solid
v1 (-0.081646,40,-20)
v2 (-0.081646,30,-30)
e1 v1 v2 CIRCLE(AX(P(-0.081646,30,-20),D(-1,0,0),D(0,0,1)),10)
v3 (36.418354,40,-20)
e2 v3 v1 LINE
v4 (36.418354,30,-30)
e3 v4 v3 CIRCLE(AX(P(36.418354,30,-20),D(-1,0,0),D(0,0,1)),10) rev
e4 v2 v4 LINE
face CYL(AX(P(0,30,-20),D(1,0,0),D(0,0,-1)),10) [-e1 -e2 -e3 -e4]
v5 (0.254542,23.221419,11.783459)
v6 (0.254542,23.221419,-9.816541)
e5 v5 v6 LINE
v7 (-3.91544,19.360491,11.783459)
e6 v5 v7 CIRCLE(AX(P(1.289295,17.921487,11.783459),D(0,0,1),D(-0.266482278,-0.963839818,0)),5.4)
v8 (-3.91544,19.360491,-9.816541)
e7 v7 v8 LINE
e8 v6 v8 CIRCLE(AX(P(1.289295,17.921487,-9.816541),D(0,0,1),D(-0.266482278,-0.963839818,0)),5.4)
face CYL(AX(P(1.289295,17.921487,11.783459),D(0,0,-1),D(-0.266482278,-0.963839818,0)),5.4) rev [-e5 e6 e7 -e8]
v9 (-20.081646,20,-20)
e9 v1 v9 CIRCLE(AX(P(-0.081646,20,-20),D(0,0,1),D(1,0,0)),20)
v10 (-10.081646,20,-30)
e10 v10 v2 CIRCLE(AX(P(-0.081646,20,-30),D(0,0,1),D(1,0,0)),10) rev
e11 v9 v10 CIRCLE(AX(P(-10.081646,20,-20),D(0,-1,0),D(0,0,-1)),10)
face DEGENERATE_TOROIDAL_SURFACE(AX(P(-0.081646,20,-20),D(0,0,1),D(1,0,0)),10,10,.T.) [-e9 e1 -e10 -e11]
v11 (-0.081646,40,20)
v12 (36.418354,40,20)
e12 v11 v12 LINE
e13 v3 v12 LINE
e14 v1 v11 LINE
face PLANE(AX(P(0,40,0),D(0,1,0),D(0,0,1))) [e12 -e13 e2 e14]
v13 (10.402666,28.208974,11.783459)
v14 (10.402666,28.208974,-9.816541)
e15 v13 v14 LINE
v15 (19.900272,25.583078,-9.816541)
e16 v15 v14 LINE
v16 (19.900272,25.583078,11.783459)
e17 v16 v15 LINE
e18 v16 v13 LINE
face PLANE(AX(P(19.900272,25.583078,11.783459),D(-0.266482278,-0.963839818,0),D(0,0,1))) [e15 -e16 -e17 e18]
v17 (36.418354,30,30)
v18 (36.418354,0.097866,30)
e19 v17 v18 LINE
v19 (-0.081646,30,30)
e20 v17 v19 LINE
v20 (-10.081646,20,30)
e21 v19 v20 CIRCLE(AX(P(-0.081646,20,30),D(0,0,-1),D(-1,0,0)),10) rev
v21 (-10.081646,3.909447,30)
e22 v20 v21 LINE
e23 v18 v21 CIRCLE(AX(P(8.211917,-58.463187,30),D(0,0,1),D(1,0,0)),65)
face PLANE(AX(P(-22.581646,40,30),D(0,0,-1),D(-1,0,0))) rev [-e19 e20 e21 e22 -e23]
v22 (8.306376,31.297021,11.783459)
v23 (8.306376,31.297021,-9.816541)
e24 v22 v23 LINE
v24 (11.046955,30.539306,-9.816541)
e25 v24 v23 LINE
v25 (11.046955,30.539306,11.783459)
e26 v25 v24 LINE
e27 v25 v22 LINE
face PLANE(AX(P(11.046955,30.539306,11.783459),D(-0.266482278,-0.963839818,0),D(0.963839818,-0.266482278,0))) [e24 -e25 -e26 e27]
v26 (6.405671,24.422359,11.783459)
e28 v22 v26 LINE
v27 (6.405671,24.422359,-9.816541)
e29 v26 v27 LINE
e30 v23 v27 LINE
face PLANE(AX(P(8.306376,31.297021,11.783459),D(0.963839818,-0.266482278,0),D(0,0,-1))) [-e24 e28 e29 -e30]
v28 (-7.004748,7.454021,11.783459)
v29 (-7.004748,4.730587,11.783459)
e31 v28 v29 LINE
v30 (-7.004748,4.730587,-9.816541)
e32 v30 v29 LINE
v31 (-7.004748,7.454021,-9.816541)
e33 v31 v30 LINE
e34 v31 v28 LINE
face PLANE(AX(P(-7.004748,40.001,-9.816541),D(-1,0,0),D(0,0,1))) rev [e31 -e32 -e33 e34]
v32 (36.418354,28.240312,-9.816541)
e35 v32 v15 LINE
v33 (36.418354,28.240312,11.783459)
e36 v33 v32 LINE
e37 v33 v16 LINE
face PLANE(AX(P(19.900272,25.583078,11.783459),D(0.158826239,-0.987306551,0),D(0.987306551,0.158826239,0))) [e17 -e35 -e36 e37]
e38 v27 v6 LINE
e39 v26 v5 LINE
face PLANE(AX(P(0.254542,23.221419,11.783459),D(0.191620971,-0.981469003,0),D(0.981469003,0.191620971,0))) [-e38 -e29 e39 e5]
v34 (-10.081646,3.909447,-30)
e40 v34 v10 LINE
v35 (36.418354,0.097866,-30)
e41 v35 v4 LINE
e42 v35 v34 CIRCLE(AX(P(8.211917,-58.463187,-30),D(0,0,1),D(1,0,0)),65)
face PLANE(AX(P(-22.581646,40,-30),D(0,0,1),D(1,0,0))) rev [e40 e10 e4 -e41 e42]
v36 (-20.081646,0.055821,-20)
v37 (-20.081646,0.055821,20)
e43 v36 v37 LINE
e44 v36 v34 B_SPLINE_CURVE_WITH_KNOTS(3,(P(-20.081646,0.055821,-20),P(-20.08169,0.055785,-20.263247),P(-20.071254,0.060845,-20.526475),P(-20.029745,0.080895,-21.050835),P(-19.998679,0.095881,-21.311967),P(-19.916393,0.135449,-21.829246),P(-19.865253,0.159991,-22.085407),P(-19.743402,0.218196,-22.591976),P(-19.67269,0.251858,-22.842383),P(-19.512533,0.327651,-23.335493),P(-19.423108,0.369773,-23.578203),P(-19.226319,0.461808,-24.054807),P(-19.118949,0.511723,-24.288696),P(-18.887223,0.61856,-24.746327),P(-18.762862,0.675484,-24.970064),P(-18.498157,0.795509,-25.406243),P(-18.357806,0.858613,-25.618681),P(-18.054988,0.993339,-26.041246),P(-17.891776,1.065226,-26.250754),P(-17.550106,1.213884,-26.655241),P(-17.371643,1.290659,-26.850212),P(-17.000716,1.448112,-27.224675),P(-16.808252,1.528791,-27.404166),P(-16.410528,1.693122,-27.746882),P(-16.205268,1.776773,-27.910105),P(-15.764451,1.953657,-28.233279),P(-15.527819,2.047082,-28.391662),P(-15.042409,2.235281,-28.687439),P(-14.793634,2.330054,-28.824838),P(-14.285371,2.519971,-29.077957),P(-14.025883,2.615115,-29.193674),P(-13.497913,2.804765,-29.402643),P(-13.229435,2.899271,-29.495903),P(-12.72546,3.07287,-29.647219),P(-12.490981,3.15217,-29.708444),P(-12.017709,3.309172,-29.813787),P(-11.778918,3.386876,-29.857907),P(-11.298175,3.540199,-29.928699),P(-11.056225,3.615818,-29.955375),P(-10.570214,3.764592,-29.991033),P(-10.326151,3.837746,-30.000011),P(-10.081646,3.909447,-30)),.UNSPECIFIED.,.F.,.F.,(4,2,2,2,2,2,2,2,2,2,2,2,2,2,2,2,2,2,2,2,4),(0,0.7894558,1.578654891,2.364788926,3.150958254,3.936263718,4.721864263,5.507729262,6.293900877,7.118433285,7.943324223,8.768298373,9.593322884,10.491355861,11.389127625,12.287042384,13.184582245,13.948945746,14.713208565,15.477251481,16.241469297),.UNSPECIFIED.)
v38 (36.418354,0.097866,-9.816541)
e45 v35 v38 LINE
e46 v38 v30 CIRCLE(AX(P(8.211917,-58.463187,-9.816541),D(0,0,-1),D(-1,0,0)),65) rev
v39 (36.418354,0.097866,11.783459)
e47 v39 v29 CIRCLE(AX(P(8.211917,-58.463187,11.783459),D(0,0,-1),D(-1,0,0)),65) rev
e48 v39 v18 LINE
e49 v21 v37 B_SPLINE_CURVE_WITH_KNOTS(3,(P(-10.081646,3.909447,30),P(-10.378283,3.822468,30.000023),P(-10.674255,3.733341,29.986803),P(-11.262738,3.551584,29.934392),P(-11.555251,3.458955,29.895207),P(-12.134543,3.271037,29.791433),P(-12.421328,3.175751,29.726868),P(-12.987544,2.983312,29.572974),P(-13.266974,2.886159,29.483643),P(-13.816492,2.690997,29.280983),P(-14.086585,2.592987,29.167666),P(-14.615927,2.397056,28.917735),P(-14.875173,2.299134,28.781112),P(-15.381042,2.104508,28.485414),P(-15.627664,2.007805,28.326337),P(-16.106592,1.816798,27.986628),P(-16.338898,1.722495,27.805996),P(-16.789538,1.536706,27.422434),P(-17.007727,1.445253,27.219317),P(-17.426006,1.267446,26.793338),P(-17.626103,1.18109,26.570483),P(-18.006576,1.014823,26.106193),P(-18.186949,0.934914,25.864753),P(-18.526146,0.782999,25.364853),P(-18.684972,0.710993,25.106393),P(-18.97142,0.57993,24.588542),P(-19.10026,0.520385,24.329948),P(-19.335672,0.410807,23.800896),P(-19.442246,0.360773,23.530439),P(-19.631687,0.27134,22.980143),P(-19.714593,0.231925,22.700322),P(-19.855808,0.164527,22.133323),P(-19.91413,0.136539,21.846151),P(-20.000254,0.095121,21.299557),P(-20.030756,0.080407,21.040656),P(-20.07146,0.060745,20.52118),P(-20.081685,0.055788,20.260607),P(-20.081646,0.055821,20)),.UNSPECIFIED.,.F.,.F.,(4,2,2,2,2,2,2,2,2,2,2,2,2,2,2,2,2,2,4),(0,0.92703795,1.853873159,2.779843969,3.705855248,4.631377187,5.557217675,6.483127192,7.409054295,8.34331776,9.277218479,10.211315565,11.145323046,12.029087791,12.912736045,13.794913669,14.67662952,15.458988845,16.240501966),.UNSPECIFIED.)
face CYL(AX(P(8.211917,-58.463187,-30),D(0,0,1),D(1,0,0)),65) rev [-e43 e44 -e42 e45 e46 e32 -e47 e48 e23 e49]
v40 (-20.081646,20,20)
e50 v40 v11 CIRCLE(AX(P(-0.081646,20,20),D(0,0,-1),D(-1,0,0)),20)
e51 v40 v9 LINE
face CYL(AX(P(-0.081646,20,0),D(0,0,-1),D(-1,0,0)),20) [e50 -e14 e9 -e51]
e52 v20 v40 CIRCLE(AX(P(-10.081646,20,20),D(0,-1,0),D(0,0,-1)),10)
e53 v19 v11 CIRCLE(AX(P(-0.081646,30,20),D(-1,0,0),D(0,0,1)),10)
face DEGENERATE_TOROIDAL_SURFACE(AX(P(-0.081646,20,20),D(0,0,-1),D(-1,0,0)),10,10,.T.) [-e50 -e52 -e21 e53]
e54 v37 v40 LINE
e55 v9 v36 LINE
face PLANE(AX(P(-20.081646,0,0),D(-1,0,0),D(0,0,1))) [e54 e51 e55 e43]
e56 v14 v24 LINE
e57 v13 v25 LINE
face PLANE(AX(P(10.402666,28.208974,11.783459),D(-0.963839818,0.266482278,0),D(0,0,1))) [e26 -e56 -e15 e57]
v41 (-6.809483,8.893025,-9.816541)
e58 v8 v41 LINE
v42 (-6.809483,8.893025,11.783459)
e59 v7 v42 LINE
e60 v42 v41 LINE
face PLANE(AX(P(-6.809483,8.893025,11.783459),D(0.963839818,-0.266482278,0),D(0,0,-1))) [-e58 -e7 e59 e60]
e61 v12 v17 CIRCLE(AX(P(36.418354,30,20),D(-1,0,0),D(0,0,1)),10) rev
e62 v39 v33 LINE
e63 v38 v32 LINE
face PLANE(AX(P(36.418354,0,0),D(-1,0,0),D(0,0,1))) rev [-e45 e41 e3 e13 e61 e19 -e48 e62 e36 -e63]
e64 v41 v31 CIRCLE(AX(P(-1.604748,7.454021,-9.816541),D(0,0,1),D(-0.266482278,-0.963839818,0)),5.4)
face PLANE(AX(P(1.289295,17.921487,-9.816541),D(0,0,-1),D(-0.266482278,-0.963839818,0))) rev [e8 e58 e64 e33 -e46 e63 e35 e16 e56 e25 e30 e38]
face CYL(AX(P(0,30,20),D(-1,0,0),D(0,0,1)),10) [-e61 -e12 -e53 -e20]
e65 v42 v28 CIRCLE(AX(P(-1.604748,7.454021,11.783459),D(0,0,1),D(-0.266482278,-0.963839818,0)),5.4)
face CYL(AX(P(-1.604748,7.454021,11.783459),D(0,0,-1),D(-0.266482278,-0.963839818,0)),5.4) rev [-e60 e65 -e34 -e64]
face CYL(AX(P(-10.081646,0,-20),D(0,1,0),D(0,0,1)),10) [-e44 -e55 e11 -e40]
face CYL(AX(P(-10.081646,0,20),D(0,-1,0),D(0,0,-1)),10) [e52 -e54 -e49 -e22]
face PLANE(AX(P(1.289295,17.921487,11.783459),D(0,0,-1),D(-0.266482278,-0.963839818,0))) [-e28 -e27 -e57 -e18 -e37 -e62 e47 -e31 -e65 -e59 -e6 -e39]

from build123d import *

# Parameters (mm, degrees)
SKETCH1_W                      = 60
SKETCH1_H                      = 60
BOSS_EXTRUDE1_DEPTH            = 40
SKETCH2_R                      = 65
CUT_EXTRUDE1_DEPTH             = 82.241203775
CAVITY1_START                  = -9.816541319
CAVITY1_DEPTH                  = 21.6
SKETCH3_W                      = 21.6
SKETCH3_H                      = 10.847854466
CUT_EXTRUDE2_DEPTH             = 10
SKETCH4_W                      = 60
SKETCH4_H                      = 40
CUT_EXTRUDE3_DEPTH             = 2.5
SKETCH5_W                      = 60
SKETCH5_H                      = 40
CUT_EXTRUDE4_DEPTH             = 1
FILLET1_R                      = 20
FILLET2_R                      = 10
SKETCH6_W                      = 16.032155739
SKETCH6_H                      = 21.6
CUT_EXTRUDE5_DEPTH             = 58.845323025
CUT_EXTRUDE5_DIRECTION_2_REACH = 59.845


# Read off the part's stored shape, not the designer's step: Cavity1
with BuildPart() as part:
    # Sketch1 → Boss-Extrude1 (new body)
    with BuildSketch(Plane(origin=(0, 0, 0), x_dir=(1, 0, 0), z_dir=(0, 1, 0))):
        with Locations((7.418353663, 0)):
            Rectangle(SKETCH1_W, SKETCH1_H)
    extrude(amount=BOSS_EXTRUDE1_DEPTH)

    # Sketch2 → Cut-Extrude1 (cut, through all)
    with BuildSketch(Plane.XY.offset(30)):
        with Locations((8.211917099, -58.463187122)):
            Circle(SKETCH2_R)
    extrude(amount=-CUT_EXTRUDE1_DEPTH, mode=Mode.SUBTRACT)

    # Cavity1 outline → Cavity1 (cut)
    with BuildSketch(Plane.XY.offset(CAVITY1_START)):
        with BuildLine():
            Line((37.418353663, 28.401179965), (19.900272044, 25.583077508))
            Line((19.900272044, 25.583077508), (10.402665556, 28.20897422))
            Line((10.402665556, 28.20897422), (11.046955399, 30.539306317))
            Line((11.046955399, 30.539306317), (8.306376045, 31.297021255))
            Line((8.306376045, 31.297021255), (6.40567059, 24.42235921))
            Line((6.40567059, 24.42235921), (0.254542205, 23.221419402))
            ThreePointArc((0.254542205, 23.221419402), (-2.379423034, 21.883873023), (-3.91543957, 19.360491087))
            Line((-3.91543957, 19.360491087), (-6.809482783, 8.89302545))
            ThreePointArc((-6.809482783, 8.89302545), (-6.970209101, 6.844246899), (-6.353840253, 4.883783703))
            ThreePointArc((-6.353840253, 4.883783703), (14.742582186, 6.207906989), (35.148358053, 0.692777486))
            Line((35.148358053, 0.692777486), (37.418353663, 2.423285883))
            Line((37.418353663, 2.423285883), (37.418353663, 28.401179965))
        make_face()
    extrude(amount=CAVITY1_DEPTH, mode=Mode.SUBTRACT)

    # Sketch3 → Cut-Extrude2 (cut)
    with BuildSketch(Plane(origin=(37.418353663, 0, 0), x_dir=(0, 0, -1), z_dir=(1, 0, 0))):
        with Locations((-0.983458681, 5.423927233)):
            Rectangle(SKETCH3_W, SKETCH3_H)
    extrude(amount=-CUT_EXTRUDE2_DEPTH, mode=Mode.SUBTRACT)

    # Sketch4 → Cut-Extrude3 (cut)
    with BuildSketch(Plane.ZY.offset(22.581646337)):
        with Locations((0, 20)):
            Rectangle(SKETCH4_W, SKETCH4_H)
    extrude(amount=-CUT_EXTRUDE3_DEPTH, mode=Mode.SUBTRACT)

    # Sketch5 → Cut-Extrude4 (cut)
    with BuildSketch(Plane(origin=(37.418353663, 0, 0), x_dir=(0, 0, -1), z_dir=(1, 0, 0))):
        with Locations((0, 20)):
            Rectangle(SKETCH5_W, SKETCH5_H)
    extrude(amount=-CUT_EXTRUDE4_DEPTH, mode=Mode.SUBTRACT)

    # Fillet1
    fillet1_edges = [part.edges().sort_by_distance(p)[0] for p in [
        (-20.081646337, 40, 0),
    ]]
    fillet(fillet1_edges, radius=FILLET1_R)

    # Fillet2
    fillet2_edges = [part.edges().sort_by_distance(p)[0] for p in [
        (-20.081646337, 10.027910314, 30),
        (18.168353663, 40, -30),
        (-20.081646337, 10.027910314, -30),
        (-14.22378196, 34.142135624, -30),
        (18.168353663, 40, 30),
        (-14.22378196, 34.142135624, 30),
    ]]
    fillet(fillet2_edges, radius=FILLET2_R)

    # Sketch6 → Cut-Extrude5 (cut)
    with BuildSketch(Plane(origin=(0, 6.536812878, 0), x_dir=(-1, 0, 0), z_dir=(0, -1, 0))):
        with Locations((-1.011330106, -0.983458681)):
            Rectangle(SKETCH6_W, SKETCH6_H)
    extrude(amount=CUT_EXTRUDE5_DEPTH, mode=Mode.SUBTRACT)

    # Sketch6 → Cut-Extrude5 direction 2 (cut, up to next)
    with BuildSketch(Plane(origin=(0, 6.536812878, 0), x_dir=(-1, 0, 0), z_dir=(0, -1, 0)), mode=Mode.PRIVATE) as cut_extrude5_direction_2_sk1:
        with Locations((-1.011330106, -0.983458681)):
            Rectangle(SKETCH6_W, SKETCH6_H)
    cut_extrude5_direction_2_tool1 = extrude(cut_extrude5_direction_2_sk1.sketch, amount=-CUT_EXTRUDE5_DIRECTION_2_REACH, mode=Mode.PRIVATE) & part.part
    add(cut_extrude5_direction_2_tool1.solids().sort_by_distance((1.01133, 6.536813, 0.983459))[0], mode=Mode.SUBTRACT)


solid = part.part
